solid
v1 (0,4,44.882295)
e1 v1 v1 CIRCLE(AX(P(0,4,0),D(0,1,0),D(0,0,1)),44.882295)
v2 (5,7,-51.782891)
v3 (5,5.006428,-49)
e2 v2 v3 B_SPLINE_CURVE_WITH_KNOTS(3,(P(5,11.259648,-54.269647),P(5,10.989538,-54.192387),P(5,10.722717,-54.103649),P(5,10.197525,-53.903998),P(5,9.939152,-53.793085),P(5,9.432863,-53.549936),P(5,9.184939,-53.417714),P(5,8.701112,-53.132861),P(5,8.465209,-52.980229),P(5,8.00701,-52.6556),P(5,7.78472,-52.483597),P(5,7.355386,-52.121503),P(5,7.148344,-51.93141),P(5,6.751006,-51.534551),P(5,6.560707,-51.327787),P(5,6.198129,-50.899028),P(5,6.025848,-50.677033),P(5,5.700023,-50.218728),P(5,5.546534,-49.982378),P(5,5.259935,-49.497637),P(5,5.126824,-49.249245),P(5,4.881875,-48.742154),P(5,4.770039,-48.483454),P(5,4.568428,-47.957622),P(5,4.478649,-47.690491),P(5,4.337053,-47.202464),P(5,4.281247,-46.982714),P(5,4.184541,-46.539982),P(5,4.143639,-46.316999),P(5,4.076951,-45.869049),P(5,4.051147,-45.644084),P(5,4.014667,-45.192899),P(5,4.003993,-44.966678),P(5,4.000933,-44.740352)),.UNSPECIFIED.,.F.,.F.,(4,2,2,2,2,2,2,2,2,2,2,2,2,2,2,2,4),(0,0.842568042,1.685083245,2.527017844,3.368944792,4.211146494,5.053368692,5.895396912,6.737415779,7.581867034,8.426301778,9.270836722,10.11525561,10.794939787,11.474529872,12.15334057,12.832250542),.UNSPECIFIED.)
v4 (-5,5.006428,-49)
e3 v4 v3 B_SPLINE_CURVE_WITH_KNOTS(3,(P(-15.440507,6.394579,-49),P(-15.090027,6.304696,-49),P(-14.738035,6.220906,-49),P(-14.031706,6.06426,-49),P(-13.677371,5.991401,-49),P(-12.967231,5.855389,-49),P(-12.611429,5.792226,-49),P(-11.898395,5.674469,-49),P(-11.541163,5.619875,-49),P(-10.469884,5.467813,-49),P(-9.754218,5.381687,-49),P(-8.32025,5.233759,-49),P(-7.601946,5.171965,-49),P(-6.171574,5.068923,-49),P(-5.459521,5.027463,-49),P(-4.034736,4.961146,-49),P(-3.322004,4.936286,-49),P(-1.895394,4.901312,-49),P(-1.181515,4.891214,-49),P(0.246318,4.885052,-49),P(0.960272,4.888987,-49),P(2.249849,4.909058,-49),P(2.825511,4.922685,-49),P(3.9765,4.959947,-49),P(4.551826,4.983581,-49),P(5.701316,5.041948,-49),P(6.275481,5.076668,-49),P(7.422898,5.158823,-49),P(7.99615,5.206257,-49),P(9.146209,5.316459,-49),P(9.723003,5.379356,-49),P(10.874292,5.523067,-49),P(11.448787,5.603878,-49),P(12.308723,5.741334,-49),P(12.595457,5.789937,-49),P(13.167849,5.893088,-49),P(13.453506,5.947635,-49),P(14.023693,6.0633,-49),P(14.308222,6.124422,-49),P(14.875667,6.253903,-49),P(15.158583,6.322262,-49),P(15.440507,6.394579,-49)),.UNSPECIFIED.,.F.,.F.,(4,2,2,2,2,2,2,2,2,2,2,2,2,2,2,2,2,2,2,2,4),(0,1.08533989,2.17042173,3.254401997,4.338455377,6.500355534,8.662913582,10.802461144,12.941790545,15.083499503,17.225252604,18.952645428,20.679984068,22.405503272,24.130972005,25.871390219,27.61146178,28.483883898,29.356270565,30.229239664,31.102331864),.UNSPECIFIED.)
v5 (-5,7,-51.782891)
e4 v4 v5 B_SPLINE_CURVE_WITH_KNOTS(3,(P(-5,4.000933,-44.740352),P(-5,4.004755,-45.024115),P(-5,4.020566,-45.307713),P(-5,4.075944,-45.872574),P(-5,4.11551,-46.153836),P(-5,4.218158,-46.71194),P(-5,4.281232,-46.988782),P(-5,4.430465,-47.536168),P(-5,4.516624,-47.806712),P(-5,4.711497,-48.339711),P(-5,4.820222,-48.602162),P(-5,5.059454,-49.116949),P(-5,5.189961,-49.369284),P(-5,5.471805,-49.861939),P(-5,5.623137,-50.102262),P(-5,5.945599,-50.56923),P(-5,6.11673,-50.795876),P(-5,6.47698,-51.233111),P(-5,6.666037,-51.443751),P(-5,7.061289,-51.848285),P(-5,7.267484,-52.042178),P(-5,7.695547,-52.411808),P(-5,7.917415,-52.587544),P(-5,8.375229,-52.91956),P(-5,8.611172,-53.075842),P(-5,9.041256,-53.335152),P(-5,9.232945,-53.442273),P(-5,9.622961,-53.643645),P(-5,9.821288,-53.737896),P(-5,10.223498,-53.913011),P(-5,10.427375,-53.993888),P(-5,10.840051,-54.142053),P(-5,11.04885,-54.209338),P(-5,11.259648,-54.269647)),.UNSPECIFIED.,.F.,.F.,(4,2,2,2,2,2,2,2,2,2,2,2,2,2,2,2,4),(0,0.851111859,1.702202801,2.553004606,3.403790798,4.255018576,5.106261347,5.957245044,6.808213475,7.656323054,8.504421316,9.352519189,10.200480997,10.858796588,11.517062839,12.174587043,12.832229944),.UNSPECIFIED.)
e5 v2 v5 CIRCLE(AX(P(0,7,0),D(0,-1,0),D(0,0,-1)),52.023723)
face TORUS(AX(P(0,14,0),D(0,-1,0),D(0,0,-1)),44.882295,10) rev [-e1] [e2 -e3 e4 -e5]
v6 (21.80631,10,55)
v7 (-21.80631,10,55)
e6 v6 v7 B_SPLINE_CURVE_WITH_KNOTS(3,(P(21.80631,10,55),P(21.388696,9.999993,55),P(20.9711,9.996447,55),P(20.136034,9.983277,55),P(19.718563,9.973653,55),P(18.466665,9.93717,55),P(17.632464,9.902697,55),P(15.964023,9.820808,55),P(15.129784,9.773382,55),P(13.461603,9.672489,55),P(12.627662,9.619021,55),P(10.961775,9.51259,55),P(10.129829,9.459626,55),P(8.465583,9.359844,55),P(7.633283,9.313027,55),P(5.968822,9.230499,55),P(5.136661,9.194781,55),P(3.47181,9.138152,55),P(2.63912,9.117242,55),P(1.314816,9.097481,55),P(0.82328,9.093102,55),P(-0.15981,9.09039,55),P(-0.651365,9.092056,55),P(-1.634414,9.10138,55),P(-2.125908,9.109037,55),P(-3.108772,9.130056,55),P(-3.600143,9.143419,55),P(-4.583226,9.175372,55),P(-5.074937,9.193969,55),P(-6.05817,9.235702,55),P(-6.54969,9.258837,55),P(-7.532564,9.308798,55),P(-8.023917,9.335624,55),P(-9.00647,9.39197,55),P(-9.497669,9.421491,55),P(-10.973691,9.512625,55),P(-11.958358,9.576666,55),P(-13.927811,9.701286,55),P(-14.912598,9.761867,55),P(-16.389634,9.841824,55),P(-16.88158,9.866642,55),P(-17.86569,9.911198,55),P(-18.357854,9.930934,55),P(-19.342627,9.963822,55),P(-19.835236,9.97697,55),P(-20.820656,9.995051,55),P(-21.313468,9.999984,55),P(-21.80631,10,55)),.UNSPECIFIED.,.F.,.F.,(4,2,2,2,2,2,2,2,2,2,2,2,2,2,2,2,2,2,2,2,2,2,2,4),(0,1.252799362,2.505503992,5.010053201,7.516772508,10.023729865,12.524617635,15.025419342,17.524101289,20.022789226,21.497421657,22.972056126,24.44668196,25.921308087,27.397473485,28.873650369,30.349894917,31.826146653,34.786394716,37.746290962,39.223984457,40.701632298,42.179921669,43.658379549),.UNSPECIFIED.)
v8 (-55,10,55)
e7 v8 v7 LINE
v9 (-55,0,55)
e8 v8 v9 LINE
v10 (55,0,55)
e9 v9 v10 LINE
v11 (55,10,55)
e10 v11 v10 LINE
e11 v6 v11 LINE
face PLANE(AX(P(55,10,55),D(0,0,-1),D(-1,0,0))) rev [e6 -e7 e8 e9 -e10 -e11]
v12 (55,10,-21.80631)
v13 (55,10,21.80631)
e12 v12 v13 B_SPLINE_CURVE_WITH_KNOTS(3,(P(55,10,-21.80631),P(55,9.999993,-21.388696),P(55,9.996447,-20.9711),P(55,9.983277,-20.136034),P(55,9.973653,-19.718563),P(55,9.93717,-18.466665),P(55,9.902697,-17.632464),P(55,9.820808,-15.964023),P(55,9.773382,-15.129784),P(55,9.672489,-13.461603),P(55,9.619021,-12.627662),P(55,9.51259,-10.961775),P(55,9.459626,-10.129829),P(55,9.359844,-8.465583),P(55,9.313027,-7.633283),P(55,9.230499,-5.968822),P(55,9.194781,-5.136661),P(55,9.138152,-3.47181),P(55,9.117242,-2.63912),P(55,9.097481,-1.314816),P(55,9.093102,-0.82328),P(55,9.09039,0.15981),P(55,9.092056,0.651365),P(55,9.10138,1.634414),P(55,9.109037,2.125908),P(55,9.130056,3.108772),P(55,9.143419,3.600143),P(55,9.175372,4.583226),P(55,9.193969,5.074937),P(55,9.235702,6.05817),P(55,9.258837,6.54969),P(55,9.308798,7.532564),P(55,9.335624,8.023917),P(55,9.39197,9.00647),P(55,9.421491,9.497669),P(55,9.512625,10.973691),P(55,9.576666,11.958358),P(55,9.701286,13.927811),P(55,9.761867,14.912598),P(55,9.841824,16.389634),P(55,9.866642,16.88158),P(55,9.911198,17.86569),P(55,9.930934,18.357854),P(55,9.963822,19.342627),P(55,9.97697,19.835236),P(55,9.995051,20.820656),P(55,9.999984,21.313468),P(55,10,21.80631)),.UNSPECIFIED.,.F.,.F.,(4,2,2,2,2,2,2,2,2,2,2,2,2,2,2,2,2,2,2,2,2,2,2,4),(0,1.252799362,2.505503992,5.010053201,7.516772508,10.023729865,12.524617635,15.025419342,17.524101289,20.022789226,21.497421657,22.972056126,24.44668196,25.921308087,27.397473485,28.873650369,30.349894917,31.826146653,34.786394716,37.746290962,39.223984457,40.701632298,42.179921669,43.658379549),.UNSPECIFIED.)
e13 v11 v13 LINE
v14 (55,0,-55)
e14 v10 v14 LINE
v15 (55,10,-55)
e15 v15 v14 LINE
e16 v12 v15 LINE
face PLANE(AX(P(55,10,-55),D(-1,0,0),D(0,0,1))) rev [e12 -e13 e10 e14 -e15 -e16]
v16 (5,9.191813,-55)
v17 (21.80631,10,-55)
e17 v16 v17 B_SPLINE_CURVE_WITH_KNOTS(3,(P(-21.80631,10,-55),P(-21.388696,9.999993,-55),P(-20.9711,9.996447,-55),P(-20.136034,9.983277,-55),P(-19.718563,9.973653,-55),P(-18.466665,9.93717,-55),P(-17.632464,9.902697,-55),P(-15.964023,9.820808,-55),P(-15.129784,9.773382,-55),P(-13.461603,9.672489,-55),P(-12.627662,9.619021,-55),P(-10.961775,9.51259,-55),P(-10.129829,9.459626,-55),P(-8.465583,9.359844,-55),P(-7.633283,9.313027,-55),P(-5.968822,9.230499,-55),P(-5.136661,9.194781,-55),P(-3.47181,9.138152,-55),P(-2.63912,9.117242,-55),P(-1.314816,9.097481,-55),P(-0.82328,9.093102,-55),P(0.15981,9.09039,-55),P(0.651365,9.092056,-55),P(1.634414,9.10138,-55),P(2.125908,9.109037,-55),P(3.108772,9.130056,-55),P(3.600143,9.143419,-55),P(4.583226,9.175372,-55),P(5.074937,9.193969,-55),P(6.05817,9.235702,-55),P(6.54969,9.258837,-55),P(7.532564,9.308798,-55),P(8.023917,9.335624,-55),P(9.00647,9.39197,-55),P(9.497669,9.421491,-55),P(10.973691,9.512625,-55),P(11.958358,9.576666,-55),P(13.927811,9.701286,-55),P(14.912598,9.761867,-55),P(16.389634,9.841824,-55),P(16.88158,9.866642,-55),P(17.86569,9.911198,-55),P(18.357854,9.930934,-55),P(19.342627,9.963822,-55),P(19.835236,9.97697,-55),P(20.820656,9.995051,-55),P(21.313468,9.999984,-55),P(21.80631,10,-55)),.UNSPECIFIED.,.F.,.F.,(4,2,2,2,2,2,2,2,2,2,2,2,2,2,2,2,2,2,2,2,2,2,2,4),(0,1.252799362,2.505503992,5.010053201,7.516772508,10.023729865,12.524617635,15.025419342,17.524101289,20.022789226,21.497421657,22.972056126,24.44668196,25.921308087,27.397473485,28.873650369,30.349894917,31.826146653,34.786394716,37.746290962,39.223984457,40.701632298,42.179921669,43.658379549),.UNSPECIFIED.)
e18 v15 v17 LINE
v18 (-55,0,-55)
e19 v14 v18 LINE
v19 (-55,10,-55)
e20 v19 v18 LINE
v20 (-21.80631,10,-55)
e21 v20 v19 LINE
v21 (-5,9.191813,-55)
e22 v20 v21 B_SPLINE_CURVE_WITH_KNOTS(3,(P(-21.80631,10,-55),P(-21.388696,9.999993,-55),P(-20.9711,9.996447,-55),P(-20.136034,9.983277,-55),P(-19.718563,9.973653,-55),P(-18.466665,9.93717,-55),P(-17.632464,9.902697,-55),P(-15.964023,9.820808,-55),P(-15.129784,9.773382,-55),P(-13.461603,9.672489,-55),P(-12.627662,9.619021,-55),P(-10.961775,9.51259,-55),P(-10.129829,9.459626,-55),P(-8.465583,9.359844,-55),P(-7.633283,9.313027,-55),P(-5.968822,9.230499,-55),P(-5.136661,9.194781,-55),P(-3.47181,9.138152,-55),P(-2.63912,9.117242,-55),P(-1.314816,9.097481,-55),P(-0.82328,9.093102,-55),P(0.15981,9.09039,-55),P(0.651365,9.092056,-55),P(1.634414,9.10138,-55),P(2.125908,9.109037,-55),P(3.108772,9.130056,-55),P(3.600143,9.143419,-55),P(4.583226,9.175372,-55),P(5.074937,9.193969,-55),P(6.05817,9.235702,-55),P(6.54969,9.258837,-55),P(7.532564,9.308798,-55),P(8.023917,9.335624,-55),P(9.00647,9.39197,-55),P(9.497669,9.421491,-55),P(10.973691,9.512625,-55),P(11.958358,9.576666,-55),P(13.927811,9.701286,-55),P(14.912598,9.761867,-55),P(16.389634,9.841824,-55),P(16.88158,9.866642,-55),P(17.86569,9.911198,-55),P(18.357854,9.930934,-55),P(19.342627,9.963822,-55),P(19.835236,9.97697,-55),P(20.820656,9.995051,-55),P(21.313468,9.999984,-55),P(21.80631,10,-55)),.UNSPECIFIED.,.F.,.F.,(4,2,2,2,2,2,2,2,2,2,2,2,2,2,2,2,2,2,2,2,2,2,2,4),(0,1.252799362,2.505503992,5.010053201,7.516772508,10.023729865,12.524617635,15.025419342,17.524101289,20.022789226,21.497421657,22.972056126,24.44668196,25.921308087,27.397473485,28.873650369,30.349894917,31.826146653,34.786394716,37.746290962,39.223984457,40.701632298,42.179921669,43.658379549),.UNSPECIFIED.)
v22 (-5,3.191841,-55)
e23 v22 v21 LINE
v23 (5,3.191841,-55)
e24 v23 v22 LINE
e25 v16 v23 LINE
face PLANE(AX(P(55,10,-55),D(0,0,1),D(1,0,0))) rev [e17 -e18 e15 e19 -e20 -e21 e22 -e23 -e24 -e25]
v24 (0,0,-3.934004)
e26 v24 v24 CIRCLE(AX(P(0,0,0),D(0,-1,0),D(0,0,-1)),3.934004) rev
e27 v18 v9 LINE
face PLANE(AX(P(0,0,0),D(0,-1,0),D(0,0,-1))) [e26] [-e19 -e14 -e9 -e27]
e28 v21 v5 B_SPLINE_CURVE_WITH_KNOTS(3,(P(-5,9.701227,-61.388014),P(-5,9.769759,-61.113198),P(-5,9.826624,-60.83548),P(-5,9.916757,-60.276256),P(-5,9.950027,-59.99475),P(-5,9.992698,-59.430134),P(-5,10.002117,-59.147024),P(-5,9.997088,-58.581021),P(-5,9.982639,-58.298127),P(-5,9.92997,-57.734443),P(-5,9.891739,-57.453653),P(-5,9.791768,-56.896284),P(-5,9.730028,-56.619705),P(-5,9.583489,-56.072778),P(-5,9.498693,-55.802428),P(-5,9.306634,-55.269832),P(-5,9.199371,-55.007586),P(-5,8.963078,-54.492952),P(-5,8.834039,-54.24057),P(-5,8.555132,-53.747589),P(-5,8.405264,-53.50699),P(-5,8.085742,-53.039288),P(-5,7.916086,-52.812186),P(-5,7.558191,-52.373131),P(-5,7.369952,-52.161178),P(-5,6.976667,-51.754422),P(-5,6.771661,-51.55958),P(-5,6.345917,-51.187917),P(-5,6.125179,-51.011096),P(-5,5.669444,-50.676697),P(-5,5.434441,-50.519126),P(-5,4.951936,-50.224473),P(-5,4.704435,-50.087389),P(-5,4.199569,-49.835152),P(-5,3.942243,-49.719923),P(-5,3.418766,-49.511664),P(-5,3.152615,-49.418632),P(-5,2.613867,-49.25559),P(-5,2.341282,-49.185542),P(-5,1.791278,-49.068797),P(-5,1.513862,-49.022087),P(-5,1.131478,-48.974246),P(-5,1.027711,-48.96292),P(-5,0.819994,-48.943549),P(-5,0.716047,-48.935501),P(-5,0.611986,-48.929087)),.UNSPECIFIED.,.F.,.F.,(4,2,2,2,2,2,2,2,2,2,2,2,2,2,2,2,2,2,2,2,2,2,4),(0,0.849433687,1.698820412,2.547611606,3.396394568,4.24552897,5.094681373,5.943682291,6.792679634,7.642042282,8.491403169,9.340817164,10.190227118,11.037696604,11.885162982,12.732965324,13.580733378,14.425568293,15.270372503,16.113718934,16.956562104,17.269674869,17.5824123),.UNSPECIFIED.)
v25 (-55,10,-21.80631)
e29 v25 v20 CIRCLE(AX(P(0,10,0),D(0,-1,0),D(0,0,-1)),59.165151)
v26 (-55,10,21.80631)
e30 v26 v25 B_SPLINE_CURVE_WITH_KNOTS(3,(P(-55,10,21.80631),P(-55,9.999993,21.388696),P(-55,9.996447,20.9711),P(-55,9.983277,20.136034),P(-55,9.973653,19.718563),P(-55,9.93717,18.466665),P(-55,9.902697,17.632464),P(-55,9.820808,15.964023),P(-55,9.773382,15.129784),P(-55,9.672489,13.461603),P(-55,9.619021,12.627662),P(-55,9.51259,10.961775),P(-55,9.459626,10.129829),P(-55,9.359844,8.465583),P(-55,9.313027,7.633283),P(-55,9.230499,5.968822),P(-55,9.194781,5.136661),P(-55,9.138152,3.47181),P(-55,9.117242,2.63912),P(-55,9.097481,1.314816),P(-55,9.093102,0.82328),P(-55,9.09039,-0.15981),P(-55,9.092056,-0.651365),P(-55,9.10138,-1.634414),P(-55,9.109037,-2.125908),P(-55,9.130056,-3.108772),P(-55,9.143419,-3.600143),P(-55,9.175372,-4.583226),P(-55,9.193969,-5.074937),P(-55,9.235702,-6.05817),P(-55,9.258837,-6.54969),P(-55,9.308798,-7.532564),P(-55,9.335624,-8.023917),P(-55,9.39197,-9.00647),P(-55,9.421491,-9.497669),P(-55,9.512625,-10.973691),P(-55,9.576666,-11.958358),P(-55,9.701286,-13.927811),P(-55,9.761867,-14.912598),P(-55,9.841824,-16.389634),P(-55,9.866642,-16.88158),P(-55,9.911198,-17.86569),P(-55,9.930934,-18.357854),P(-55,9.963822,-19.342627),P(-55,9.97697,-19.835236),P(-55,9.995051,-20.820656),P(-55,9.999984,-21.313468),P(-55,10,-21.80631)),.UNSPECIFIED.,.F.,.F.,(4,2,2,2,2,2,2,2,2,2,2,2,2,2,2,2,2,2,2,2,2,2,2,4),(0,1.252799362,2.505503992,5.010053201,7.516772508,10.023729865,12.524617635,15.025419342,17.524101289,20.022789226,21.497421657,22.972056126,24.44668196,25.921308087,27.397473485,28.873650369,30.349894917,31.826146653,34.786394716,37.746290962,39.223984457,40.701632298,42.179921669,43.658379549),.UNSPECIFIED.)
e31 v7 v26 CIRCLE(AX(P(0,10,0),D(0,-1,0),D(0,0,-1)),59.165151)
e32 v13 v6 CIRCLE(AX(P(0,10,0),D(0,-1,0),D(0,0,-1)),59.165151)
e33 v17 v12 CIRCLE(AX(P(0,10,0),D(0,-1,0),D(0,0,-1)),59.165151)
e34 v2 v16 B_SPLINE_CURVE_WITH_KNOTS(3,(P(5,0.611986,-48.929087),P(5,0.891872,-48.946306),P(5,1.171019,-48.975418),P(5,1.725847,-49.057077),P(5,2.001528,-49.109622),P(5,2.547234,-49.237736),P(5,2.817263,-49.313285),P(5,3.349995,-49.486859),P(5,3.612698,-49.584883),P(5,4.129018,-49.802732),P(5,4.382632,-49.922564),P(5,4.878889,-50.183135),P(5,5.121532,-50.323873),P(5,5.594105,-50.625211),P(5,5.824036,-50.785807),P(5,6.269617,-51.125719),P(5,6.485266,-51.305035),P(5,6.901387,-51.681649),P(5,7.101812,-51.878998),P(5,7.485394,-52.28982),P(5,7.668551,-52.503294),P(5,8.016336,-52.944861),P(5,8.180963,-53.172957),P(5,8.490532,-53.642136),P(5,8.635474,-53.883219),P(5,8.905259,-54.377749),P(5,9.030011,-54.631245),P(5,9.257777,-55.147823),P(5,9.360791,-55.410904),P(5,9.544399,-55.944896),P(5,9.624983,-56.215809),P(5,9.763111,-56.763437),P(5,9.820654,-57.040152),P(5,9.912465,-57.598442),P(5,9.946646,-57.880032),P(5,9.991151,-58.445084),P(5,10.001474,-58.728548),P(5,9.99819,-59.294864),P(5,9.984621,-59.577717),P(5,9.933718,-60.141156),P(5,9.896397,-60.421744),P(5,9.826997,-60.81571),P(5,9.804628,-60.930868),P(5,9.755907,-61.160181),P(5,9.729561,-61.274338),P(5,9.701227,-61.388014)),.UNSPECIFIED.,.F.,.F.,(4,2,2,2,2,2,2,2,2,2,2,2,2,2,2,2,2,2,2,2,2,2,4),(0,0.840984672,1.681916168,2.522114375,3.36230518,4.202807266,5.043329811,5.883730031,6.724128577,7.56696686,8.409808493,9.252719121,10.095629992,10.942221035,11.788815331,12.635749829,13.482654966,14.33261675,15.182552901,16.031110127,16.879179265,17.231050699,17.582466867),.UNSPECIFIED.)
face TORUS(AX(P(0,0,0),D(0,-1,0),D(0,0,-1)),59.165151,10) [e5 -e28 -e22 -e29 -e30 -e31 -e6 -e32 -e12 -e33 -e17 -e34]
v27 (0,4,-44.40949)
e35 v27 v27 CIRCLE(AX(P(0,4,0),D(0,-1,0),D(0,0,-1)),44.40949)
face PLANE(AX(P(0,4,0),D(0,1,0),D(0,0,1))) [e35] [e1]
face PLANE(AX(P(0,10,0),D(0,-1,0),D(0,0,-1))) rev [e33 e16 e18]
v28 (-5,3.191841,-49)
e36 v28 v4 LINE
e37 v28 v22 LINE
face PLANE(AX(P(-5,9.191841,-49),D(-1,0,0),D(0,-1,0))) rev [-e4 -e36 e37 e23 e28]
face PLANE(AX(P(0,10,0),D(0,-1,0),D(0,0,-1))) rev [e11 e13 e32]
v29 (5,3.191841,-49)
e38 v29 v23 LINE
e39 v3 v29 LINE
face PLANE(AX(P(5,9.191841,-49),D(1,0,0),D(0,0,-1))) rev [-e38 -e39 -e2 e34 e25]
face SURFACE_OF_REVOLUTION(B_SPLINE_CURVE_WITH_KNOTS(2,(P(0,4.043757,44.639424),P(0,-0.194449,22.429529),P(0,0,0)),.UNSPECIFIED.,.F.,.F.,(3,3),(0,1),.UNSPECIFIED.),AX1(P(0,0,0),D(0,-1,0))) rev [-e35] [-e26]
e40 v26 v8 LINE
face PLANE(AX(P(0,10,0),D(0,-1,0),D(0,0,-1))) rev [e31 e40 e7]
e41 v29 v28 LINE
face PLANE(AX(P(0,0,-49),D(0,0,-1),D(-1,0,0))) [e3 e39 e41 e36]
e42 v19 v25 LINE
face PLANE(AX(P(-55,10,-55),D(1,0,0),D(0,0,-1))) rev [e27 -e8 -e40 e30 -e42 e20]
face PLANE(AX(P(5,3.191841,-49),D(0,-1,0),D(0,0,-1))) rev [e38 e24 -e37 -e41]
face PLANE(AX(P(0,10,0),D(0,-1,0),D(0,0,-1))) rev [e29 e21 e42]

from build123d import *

# Parameters (mm, degrees)
SKETCH1_W           = 110
SKETCH1_H           = 110
BOSS_EXTRUDE1_DEPTH = 10
SKETCH2_R           = 50
CUT_EXTRUDE1_DEPTH  = 6
FILLET1_R           = 10
FILLET2_R           = 10
SKETCH4_W           = 10
SKETCH4_H           = 6
CUT_EXTRUDE2_DEPTH  = 6


with BuildPart() as part:
    # Sketch1 → Boss-Extrude1 (new body)
    with BuildSketch(Plane(origin=(0, 0, 0), x_dir=(1, 0, 0), z_dir=(0, 1, 0))):
        Rectangle(SKETCH1_W, SKETCH1_H)
    extrude(amount=BOSS_EXTRUDE1_DEPTH)

    # Sketch2 → Cut-Extrude1 (cut)
    with BuildSketch(Plane(origin=(0, 10, 0), x_dir=(1, 0, 0), z_dir=(0, 1, 0))):
        with Locations(Location((0, 0, 0), (0, 0, 270))):
            Circle(SKETCH2_R)
    extrude(amount=-CUT_EXTRUDE1_DEPTH, mode=Mode.SUBTRACT)

    # Fillet1
    # the kernel refuses this fillet: 10 mm, written as the material it takes off along each edge
    with BuildSketch(Plane(origin=(0, 10, 0), x_dir=(0, 0, 1), z_dir=(-1, 0, 0))) as fillet1_piece_1:
        with BuildLine():
            CenterArc((59.16515139, -10), FILLET1_R, 90, 66.421821522)
            Line((50, -6), (50, 0))
            Line((50, 0), (59.16515139, 0))
        make_face()
    revolve(axis=Axis((0, 10, 0), (0, 1, 0)), mode=Mode.SUBTRACT)

    # Fillet2
    fillet2_edges = [part.edges().sort_by_distance(p)[0] for p in [
        (0, 4, -50),
    ]]
    fillet(fillet2_edges, radius=FILLET2_R)

    # Sketch3 → Cut-Revolve3 (revolve, cut)
    with BuildSketch(Plane(origin=(0, 0, 0), x_dir=(0, 0, -1), z_dir=(1, 0, 0)), mode=Mode.PRIVATE) as cut_revolve3_sk:
        with BuildLine():
            Line((0, 0), (0, 10.285805254))
            Line((0, 10.285805254), (-44.639424331, 4.043757306))
            add(Edge.make_bspline(
                [(0, 0), (-22.429529075, -0.19444877), (-44.639424331, 4.043757306)],
                knots=[0, 0, 0, 1, 1, 1], degree=2))
        make_face()
    revolve(cut_revolve3_sk.sketch.rotate(Axis((0, 0, 0), (0, 1, 0)), 180), axis=Axis((0, 0, 0), (0, 1, 0)), mode=Mode.SUBTRACT)

    # Sketch4 → Cut-Extrude2 (cut)
    with BuildSketch(Plane(origin=(0, 0, -55), x_dir=(-1, 0, 0), z_dir=(0, 0, -1))):
        with Locations((0, 6.191841145)):
            Rectangle(SKETCH4_W, SKETCH4_H)
    extrude(amount=-CUT_EXTRUDE2_DEPTH, mode=Mode.SUBTRACT)


solid = part.part
